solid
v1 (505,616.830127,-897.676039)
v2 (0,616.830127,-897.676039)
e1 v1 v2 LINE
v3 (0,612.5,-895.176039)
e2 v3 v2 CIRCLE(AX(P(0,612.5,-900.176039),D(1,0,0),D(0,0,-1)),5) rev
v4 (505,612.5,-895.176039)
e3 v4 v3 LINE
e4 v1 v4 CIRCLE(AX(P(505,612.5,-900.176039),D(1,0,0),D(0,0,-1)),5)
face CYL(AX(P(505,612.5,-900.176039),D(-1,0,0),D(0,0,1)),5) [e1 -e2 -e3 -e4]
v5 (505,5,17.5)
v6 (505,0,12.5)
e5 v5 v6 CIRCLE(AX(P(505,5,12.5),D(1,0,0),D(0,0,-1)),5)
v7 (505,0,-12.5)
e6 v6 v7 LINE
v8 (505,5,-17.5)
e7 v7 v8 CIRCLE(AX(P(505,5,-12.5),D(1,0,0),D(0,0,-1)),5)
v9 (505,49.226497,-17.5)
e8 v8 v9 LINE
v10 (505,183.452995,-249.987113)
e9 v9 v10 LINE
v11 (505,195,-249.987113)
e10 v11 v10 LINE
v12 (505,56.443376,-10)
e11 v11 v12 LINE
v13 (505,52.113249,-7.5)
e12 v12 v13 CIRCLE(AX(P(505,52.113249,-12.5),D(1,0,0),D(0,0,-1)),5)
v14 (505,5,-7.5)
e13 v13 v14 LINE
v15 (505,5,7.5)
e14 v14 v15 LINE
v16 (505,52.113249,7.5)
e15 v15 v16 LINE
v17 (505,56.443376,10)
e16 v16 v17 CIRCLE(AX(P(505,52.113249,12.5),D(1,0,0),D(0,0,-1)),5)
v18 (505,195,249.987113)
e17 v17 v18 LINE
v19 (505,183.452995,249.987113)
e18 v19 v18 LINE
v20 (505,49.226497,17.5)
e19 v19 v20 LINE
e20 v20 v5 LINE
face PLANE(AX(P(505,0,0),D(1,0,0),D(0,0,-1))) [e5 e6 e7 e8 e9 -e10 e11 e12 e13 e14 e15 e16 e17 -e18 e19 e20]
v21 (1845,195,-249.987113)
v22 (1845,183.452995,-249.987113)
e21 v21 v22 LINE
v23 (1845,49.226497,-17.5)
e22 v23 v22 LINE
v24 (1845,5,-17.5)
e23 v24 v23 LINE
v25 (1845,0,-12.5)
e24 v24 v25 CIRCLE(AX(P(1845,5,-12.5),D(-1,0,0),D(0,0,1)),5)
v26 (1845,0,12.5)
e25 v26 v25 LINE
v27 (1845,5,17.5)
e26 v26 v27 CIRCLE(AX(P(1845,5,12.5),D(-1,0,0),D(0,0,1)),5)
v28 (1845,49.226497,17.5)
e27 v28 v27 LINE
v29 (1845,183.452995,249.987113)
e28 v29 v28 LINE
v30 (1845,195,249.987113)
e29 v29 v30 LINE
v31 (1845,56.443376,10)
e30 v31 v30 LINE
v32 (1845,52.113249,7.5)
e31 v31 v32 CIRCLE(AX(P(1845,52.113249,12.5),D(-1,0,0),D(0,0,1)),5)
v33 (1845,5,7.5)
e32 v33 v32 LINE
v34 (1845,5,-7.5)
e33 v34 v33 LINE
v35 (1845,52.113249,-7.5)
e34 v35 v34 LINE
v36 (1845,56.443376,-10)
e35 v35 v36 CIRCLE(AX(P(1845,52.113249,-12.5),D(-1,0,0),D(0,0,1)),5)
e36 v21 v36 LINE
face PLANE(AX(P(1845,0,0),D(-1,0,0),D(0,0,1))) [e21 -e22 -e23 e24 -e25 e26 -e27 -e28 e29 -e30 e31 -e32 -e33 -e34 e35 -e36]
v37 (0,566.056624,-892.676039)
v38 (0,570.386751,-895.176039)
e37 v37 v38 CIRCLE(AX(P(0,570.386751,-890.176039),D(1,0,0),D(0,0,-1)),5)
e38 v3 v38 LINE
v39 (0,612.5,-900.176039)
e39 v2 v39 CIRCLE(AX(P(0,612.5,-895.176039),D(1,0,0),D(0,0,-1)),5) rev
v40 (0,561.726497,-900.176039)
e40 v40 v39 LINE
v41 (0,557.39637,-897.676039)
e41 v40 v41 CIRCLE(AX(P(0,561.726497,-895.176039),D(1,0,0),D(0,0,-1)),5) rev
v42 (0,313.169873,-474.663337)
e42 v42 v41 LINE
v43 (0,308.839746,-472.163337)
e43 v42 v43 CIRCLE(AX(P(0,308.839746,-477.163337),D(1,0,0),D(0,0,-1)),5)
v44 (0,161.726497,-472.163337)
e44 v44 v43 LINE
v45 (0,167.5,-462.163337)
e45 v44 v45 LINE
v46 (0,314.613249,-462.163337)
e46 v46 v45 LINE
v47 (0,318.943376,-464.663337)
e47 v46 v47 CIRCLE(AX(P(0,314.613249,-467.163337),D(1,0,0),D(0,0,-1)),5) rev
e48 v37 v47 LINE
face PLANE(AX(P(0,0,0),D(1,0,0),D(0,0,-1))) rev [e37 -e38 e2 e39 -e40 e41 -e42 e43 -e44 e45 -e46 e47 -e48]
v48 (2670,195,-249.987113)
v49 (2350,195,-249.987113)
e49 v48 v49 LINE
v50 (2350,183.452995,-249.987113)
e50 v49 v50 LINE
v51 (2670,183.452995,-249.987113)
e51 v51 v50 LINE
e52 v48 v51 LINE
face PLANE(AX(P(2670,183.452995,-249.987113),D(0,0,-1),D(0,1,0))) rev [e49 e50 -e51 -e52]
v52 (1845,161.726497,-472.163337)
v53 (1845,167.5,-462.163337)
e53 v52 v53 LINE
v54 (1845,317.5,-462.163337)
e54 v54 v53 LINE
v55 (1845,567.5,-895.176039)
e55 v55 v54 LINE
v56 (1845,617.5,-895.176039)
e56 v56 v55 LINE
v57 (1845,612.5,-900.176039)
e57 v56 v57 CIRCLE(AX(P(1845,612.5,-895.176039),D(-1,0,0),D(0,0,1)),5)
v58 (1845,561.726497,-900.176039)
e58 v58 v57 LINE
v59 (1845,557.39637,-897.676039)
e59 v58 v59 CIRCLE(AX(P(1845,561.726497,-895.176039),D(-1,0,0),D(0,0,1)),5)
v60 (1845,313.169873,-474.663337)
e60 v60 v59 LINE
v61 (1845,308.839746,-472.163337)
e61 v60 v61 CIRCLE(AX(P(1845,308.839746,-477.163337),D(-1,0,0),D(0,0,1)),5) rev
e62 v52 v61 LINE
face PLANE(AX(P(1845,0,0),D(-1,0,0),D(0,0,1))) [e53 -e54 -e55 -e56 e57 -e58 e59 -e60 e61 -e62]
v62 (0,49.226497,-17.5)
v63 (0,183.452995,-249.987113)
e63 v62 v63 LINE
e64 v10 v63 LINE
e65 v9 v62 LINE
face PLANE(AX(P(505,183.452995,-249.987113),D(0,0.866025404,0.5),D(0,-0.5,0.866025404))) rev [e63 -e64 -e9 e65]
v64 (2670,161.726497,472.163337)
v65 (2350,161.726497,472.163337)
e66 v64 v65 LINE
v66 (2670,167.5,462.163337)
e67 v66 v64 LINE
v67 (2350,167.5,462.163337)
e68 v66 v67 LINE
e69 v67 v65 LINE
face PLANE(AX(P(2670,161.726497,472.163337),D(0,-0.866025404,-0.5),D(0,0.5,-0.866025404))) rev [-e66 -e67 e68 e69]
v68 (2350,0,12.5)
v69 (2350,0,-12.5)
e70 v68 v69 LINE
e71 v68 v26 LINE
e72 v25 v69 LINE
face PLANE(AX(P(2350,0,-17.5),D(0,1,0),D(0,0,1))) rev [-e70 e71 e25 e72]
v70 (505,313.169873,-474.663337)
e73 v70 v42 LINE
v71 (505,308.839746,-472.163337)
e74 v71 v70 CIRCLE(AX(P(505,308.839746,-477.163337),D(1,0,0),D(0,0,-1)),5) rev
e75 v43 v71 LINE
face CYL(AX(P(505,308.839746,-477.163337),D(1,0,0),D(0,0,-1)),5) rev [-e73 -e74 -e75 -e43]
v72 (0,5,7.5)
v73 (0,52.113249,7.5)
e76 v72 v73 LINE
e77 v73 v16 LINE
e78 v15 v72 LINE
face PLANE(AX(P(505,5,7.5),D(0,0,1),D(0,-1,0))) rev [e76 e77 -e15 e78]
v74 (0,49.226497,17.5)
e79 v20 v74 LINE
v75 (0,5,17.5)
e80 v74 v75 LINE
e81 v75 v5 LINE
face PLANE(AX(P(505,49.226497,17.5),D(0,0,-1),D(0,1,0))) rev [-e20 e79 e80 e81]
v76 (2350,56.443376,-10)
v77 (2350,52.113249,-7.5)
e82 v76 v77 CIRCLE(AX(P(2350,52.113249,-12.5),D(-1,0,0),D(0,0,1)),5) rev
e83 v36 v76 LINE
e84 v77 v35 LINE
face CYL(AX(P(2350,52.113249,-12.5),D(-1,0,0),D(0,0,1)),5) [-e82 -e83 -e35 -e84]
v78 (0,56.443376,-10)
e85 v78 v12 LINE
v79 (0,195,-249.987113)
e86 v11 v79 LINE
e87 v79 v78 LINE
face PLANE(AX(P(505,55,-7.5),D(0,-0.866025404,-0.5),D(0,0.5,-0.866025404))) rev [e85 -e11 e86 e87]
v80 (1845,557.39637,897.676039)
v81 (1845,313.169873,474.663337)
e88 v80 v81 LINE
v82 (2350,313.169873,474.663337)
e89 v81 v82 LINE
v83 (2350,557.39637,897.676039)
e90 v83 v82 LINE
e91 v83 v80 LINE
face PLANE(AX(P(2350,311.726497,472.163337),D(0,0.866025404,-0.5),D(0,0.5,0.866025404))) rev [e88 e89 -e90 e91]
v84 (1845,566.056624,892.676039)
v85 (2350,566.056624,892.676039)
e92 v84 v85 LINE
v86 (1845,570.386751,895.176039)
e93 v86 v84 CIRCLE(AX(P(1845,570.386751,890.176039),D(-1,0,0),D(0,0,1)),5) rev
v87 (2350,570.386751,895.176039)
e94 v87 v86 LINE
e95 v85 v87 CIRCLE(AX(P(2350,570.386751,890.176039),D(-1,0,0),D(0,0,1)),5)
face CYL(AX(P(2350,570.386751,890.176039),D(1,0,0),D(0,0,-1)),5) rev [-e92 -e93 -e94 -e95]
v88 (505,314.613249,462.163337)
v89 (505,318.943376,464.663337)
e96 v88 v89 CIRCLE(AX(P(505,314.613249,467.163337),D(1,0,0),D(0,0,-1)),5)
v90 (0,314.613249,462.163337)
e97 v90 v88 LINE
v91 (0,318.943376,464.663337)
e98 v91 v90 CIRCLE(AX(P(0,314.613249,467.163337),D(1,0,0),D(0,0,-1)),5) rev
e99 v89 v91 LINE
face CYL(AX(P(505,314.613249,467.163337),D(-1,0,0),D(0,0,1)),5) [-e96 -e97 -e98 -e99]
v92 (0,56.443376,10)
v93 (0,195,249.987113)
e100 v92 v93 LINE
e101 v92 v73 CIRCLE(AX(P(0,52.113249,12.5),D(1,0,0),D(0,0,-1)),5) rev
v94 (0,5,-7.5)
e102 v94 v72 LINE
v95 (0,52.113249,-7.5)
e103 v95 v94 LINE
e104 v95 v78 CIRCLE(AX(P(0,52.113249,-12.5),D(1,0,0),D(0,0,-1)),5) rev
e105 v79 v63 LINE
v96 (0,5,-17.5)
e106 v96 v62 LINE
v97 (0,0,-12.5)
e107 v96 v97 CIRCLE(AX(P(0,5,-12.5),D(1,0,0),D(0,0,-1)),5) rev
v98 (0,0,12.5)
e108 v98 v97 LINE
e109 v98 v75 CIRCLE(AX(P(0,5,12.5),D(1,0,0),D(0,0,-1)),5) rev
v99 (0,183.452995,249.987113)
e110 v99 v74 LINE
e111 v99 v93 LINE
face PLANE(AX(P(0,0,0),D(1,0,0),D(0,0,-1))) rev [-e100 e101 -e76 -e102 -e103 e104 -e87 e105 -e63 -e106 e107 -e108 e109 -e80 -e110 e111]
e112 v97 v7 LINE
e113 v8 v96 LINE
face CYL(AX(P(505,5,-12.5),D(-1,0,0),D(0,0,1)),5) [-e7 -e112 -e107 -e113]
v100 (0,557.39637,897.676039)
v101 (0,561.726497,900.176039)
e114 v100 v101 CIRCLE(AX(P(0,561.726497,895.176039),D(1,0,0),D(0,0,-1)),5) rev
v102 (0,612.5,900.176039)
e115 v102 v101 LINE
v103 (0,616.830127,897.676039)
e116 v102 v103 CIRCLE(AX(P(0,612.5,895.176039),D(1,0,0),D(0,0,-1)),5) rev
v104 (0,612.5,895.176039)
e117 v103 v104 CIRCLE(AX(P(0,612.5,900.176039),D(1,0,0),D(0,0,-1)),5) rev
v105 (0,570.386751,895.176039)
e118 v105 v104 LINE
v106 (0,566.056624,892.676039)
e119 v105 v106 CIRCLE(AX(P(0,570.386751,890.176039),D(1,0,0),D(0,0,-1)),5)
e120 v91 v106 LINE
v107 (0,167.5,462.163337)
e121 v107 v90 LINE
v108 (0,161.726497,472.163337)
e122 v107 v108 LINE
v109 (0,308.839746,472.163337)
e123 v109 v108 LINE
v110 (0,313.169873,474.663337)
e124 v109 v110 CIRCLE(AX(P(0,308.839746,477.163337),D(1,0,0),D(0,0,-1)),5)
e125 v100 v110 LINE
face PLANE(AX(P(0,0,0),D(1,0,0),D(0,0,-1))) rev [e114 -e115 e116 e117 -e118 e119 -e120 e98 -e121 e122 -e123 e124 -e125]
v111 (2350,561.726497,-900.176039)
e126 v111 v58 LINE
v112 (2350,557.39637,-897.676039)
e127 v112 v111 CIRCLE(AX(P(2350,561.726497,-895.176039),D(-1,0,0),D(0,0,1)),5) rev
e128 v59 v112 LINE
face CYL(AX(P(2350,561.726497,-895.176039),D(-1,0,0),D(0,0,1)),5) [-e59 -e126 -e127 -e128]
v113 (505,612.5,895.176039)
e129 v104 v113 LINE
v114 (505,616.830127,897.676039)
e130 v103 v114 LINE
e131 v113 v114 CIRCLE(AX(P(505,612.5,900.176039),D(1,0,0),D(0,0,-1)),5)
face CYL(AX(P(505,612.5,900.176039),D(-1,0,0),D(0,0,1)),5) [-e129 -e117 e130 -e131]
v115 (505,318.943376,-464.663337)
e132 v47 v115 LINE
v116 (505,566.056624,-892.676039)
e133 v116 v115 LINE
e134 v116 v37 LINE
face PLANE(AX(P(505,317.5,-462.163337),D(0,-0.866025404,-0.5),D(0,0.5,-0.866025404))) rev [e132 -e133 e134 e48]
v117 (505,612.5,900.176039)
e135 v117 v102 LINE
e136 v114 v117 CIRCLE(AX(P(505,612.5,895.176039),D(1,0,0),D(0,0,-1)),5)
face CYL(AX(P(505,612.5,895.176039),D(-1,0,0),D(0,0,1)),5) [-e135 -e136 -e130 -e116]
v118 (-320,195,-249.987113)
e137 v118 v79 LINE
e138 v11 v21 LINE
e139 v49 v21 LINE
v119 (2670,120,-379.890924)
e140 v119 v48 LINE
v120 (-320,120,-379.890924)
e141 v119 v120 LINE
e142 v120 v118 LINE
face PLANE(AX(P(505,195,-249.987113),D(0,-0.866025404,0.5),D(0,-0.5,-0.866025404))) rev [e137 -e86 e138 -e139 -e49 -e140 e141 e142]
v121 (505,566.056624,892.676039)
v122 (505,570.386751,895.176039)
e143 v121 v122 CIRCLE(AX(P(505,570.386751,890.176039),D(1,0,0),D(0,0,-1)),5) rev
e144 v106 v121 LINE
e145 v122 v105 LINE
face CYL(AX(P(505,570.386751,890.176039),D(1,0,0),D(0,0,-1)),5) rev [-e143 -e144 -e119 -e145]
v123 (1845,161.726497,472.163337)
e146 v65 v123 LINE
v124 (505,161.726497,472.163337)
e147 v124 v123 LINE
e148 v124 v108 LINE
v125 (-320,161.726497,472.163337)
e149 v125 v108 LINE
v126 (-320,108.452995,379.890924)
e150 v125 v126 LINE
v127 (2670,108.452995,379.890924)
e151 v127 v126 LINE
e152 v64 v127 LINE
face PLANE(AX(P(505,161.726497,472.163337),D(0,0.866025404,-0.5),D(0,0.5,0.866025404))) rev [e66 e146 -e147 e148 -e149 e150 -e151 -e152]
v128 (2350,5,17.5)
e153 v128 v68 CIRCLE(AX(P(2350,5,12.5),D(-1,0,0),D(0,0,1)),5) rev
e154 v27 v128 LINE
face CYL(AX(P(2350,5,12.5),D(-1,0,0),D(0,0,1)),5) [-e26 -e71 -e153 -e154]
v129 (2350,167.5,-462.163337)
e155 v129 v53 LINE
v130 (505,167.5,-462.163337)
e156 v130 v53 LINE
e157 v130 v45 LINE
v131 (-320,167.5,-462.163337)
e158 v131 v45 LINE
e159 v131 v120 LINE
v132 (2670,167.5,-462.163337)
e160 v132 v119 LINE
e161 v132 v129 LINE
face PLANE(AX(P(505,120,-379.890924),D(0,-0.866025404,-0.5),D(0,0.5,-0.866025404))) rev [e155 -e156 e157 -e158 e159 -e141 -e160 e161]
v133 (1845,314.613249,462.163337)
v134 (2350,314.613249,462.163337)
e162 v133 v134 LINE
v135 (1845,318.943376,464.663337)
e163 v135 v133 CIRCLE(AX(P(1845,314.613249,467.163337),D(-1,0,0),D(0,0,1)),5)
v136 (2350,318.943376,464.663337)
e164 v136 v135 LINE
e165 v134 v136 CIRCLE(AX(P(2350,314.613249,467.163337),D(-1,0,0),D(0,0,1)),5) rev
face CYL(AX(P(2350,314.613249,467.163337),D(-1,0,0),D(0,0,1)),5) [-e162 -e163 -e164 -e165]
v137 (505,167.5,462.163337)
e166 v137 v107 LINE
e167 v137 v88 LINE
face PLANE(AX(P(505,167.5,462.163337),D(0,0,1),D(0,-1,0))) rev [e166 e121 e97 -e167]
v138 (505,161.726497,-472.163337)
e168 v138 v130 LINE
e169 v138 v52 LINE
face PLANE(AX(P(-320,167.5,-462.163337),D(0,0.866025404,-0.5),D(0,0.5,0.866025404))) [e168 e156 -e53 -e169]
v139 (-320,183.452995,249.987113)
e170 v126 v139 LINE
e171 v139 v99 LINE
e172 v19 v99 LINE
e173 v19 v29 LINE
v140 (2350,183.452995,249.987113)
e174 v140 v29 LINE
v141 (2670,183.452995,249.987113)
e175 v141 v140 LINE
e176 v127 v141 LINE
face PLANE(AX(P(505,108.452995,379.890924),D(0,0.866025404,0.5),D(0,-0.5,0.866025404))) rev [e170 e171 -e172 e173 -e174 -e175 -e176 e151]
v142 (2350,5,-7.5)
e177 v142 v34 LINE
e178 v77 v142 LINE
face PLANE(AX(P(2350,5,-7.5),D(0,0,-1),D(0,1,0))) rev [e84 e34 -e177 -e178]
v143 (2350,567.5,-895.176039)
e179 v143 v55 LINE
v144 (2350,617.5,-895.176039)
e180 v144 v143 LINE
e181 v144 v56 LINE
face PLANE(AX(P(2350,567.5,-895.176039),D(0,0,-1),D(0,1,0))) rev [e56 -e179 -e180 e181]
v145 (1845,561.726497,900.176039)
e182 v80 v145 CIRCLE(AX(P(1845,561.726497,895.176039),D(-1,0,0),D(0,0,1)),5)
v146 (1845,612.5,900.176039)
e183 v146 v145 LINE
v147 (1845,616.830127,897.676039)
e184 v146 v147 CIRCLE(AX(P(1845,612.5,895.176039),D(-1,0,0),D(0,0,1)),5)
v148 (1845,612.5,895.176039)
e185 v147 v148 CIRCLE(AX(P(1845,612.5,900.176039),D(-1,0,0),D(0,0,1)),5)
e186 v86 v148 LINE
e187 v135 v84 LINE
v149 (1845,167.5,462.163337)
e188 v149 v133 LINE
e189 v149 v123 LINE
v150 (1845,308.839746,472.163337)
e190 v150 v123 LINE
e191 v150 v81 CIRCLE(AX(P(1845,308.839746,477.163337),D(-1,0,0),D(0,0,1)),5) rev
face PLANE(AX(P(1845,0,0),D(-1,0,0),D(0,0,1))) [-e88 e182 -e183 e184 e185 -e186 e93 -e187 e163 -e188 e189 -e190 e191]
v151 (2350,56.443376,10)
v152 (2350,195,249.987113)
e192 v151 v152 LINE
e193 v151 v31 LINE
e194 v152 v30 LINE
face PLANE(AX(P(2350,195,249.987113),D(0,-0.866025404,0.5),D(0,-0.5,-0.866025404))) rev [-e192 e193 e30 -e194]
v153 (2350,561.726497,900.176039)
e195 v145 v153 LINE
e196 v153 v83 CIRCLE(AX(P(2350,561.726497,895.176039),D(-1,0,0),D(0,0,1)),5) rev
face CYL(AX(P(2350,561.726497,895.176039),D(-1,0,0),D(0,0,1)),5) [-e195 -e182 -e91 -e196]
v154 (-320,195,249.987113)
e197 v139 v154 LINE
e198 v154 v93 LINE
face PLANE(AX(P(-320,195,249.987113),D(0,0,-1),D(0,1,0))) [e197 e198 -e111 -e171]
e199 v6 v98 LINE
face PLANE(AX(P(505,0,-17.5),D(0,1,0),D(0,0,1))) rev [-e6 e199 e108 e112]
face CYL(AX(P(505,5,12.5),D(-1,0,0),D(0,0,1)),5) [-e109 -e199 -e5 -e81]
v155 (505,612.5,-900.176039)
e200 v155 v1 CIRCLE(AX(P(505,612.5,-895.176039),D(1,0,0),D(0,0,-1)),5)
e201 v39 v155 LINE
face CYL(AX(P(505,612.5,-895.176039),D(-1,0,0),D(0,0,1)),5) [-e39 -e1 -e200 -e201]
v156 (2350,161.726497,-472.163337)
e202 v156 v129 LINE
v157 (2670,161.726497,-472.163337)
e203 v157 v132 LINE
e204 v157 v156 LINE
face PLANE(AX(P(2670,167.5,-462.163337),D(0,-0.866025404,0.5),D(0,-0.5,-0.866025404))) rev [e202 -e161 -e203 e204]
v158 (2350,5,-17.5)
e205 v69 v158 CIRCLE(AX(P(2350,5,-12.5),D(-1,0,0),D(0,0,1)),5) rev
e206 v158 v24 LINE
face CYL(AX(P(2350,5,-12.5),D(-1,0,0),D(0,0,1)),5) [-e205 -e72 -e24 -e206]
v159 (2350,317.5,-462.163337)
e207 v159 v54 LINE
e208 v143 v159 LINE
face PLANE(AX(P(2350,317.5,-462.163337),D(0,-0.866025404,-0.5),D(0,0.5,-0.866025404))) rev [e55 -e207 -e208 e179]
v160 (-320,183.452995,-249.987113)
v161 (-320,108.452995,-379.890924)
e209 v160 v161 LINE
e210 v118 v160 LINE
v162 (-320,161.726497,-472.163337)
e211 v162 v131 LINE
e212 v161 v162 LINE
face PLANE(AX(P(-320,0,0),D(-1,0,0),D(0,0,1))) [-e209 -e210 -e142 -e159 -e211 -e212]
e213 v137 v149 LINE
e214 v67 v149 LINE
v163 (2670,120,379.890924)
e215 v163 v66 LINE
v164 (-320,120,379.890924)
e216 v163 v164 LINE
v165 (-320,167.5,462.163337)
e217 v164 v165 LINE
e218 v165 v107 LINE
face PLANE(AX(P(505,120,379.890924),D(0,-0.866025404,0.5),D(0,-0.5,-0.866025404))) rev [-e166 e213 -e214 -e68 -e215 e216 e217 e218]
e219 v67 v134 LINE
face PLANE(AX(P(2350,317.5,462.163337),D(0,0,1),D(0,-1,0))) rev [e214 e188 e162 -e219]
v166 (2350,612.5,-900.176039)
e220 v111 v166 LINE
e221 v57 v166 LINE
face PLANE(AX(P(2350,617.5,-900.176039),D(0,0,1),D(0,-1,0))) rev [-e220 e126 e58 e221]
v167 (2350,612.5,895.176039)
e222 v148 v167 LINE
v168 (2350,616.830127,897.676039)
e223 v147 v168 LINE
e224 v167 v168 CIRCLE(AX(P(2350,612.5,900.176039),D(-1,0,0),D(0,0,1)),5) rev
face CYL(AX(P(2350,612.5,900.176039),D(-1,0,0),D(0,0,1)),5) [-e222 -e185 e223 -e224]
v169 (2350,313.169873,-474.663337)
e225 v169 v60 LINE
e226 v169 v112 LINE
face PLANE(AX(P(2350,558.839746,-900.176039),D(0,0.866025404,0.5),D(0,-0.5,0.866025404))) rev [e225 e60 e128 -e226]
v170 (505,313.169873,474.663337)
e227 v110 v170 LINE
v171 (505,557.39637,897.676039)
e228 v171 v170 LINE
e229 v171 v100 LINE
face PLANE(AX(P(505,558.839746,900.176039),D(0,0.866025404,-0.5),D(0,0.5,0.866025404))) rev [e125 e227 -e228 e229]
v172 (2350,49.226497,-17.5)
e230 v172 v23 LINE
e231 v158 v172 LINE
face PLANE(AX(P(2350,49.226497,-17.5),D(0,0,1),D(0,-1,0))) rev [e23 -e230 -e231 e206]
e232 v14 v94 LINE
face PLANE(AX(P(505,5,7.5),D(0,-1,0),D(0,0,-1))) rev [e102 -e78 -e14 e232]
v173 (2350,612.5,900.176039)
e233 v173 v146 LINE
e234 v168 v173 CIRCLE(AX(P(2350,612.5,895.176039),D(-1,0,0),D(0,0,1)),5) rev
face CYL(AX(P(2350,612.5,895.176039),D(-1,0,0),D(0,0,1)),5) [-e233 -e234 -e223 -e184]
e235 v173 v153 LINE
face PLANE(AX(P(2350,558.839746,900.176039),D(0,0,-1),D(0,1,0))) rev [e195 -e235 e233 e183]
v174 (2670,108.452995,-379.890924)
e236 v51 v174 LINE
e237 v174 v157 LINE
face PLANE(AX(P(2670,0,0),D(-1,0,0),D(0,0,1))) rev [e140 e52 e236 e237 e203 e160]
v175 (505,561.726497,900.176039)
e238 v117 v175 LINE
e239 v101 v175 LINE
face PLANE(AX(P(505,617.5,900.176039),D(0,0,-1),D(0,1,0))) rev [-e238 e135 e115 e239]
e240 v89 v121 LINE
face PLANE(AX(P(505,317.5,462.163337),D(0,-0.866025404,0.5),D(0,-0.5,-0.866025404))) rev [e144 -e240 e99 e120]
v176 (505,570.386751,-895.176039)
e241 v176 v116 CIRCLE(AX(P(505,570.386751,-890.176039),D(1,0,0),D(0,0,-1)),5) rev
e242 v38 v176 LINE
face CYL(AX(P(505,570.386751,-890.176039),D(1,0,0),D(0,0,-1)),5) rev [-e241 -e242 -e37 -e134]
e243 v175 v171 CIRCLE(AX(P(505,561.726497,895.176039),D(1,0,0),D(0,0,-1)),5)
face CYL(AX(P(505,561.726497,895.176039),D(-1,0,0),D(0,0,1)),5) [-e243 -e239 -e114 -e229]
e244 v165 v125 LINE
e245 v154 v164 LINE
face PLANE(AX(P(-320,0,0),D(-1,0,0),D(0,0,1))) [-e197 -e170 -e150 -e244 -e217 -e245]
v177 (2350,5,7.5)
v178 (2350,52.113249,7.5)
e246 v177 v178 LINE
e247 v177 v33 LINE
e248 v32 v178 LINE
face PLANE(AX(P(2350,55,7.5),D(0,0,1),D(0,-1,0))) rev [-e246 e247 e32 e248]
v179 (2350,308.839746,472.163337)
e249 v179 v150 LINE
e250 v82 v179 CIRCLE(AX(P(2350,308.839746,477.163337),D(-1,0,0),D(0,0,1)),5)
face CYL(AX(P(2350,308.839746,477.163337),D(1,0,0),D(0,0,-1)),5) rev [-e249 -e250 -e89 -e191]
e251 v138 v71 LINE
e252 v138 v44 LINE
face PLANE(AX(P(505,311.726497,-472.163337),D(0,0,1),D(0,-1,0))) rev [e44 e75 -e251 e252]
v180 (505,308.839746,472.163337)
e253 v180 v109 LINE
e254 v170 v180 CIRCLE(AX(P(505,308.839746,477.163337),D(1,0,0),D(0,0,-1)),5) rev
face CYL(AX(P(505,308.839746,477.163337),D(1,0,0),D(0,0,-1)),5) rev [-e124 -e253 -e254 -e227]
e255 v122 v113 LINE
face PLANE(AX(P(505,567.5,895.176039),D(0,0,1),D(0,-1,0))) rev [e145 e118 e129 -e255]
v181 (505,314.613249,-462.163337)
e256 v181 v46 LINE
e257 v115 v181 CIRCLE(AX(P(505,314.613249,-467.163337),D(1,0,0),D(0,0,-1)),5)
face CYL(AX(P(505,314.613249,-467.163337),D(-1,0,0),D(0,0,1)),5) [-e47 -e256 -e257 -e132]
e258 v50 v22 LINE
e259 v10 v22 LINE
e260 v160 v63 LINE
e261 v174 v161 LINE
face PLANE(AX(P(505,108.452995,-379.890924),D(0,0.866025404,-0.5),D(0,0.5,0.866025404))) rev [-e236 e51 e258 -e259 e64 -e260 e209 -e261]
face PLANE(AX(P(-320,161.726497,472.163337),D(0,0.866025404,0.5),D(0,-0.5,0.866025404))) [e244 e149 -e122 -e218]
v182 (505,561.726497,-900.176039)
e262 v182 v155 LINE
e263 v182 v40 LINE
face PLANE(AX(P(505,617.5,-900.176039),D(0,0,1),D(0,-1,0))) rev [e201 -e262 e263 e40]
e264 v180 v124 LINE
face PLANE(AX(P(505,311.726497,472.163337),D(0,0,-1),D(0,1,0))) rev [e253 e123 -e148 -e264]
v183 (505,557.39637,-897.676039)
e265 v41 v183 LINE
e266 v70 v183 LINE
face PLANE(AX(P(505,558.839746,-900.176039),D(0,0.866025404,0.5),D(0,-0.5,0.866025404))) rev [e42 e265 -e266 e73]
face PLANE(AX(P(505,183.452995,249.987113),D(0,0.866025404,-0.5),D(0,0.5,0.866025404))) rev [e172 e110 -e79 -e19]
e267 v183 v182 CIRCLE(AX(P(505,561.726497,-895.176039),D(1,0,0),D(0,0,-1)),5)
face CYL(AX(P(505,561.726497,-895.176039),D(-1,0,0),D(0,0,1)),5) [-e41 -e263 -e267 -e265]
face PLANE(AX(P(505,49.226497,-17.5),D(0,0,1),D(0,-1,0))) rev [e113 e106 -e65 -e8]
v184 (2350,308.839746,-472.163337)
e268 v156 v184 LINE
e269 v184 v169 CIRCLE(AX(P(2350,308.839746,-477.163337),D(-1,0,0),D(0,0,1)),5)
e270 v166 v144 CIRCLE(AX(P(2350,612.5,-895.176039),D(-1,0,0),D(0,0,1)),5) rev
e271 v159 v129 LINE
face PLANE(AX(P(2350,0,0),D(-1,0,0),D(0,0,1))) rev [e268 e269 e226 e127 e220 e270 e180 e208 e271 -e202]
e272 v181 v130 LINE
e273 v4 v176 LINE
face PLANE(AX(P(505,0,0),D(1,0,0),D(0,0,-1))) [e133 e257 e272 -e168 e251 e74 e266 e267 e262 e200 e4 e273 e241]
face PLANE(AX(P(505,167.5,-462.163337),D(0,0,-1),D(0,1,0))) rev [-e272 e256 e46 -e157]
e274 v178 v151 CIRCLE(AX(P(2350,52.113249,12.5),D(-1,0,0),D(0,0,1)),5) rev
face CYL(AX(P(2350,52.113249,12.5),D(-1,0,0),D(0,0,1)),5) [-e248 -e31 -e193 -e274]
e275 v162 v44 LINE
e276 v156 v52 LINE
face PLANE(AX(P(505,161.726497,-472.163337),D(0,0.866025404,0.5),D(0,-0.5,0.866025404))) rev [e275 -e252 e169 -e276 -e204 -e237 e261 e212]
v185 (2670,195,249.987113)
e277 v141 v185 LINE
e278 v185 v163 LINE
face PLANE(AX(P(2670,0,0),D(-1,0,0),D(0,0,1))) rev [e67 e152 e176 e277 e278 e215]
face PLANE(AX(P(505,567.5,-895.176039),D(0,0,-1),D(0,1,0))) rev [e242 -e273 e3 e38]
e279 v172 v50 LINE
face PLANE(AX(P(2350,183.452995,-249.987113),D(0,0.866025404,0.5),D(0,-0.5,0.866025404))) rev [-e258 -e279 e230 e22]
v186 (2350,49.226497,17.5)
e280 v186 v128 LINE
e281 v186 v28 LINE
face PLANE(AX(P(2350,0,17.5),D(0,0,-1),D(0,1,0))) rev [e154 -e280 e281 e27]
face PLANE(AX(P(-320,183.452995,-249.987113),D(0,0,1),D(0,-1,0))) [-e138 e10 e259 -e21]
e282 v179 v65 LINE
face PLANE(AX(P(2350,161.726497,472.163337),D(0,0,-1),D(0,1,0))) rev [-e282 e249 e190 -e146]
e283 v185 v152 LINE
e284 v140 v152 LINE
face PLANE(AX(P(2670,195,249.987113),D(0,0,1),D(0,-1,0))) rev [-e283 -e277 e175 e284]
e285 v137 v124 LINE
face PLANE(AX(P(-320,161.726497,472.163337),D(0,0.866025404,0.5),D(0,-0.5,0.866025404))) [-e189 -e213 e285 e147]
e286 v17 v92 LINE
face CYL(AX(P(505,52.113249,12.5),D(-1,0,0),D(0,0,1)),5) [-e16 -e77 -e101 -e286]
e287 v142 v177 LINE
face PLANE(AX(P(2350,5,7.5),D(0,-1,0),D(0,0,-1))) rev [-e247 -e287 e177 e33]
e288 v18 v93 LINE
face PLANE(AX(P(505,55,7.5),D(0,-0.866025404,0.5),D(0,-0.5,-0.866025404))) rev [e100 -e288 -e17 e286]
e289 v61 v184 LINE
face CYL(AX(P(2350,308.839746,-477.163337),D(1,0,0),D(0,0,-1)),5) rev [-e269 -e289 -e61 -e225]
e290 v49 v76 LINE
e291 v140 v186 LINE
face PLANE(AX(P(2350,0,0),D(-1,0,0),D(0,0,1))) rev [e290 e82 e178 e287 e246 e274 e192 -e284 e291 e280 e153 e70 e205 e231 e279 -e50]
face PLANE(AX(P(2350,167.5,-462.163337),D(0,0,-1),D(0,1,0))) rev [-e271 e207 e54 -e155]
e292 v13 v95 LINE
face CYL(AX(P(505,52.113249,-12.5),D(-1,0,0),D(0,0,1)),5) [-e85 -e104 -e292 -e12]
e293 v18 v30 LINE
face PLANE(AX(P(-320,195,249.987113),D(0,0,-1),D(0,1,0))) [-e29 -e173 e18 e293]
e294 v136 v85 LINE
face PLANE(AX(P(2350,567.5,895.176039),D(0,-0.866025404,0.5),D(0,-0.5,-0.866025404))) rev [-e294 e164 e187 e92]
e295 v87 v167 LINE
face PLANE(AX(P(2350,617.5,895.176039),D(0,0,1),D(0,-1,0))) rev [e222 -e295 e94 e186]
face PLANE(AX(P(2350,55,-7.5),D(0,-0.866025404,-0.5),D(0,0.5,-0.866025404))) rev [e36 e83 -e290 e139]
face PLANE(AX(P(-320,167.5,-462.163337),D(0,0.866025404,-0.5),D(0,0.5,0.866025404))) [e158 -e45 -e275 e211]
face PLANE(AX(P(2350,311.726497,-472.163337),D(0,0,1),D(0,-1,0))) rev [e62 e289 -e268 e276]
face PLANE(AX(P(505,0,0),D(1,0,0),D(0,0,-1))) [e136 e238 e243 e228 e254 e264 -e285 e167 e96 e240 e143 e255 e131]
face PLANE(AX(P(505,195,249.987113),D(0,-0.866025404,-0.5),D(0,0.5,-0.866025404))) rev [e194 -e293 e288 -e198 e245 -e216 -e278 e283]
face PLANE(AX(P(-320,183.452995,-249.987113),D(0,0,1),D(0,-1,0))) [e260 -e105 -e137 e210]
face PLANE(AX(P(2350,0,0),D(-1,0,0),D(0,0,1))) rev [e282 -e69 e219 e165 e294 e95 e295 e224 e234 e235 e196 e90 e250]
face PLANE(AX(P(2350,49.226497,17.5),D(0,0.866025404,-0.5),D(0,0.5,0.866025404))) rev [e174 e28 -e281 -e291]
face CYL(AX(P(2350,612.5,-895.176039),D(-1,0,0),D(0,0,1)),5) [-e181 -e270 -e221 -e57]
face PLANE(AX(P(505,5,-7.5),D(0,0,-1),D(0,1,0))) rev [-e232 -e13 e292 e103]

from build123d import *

# Parameters (mm, degrees)
BOSS_EXTRUDE1_DEPTH      = 505
BOSS_EXTRUDE3_DEPTH      = 1340
BOSS_EXTRUDE3_DEPTH_BACK = 825
BOSS_EXTRUDE4_DEPTH      = 505
BOSS_EXTRUDE5_DEPTH      = 320
FILLET1_R                = 5


with BuildPart() as part:
    # Sketch1 → Boss-Extrude1 (new body)
    with BuildSketch(Plane(origin=(0, 0, 0), x_dir=(0, 0, -1), z_dir=(1, 0, 0))):
        Polygon((-7.5, 5), (7.5, 5), (7.5, 55), (249.98711306, 195), (379.890923627, 120), (462.163336987, 167.5), (462.163336987, 317.5), (895.176038879, 567.5), (895.176038879, 617.5), (900.176038879, 617.5), (900.176038879, 558.839745962), (472.163336987, 311.726497308), (472.163336987, 161.726497308), (379.890923627, 108.452994616), (249.98711306, 183.452994616), (17.5, 49.226497308), (17.5, 0), (-17.5, 0), (-17.5, 49.226497308), (-249.98711306, 183.452994616), (-379.890923627, 108.452994616), (-472.163336987, 161.726497308), (-472.163336987, 311.726497308), (-900.176038879, 558.839745962), (-900.176038879, 617.5), (-895.176038879, 617.5), (-895.176038879, 567.5), (-462.163336987, 317.5), (-462.163336987, 167.5), (-379.890923627, 120), (-249.98711306, 195), (-7.5, 55), align=None)
    extrude(amount=BOSS_EXTRUDE1_DEPTH)

    # Sketch2 → Boss-Extrude3 (add, two sides: drawn at the far end of the back side and taken through both)
    with BuildSketch(Plane(origin=(505, 0, 0), x_dir=(0, 0, -1), z_dir=(1, 0, 0)).offset(-BOSS_EXTRUDE3_DEPTH_BACK)):
        Polygon((249.98711306, 195), (379.890923627, 120), (462.163336987, 167.5), (472.163336987, 161.726497308), (379.890923627, 108.452994616), (249.98711306, 183.452994616), align=None)
        Polygon((-462.163336987, 167.5), (-379.890923627, 120), (-249.98711306, 195), (-249.98711306, 183.452994616), (-379.890923627, 108.452994616), (-472.163336987, 161.726497308), align=None)
    extrude(amount=BOSS_EXTRUDE3_DEPTH + BOSS_EXTRUDE3_DEPTH_BACK)

    # Sketch4 → Boss-Extrude4 (add)
    with BuildSketch(Plane(origin=(1845, 0, 0), x_dir=(0, 0, -1), z_dir=(1, 0, 0))):
        Polygon((-900.176038879, 617.5), (-895.176038879, 617.5), (-895.176038879, 567.5), (-462.163336987, 317.5), (-462.163336987, 167.5), (-379.890923627, 120), (-249.98711306, 195), (-7.5, 55), (-7.5, 5), (7.5, 5), (7.5, 55), (249.98711306, 195), (379.890923627, 120), (462.163336987, 167.5), (462.163336987, 317.5), (895.176038879, 567.5), (895.176038879, 617.5), (900.176038879, 617.5), (900.176038879, 558.839745962), (472.163336987, 311.726497308), (472.163336987, 161.726497308), (379.890923627, 108.452994616), (249.98711306, 183.452994616), (17.5, 49.226497308), (17.5, 0), (-17.5, 0), (-17.5, 49.226497308), (-249.98711306, 183.452994616), (-379.890923627, 108.452994616), (-472.163336987, 161.726497308), (-472.163336987, 311.726497308), (-900.176038879, 558.839745962), align=None)
    extrude(amount=BOSS_EXTRUDE4_DEPTH)

    # Sketch5 → Boss-Extrude5 (add)
    with BuildSketch(Plane(origin=(2350, 0, 0), x_dir=(0, 0, -1), z_dir=(1, 0, 0))):
        Polygon((249.98711306, 195), (379.890923627, 120), (462.163336987, 167.5), (472.163336987, 161.726497308), (379.890923627, 108.452994616), (249.98711306, 183.452994616), align=None)
        Polygon((-462.163336987, 167.5), (-379.890923627, 120), (-249.98711306, 195), (-249.98711306, 183.452994616), (-379.890923627, 108.452994616), (-472.163336987, 161.726497308), align=None)
    extrude(amount=BOSS_EXTRUDE5_DEPTH)

    # Fillet1
    # the kernel refuses this fillet: 5 mm, written as the material it adds along each edge
    with BuildSketch(Plane(origin=(0, 567.5, -895.176038879), x_dir=(0, -0.4999999999999892, 0.8660254037844449), z_dir=(1, 0, 0)), Plane(origin=(0, 311.726497308, -472.163336987), x_dir=(0, 0.5000000000000101, -0.8660254037844327), z_dir=(1, 0, 0)), Plane(origin=(1845, 311.726497308, -472.163336987), x_dir=(0, 0.4999999999999846, -0.8660254037844476), z_dir=(1, 0, 0)), Plane(origin=(0, 311.726497308, 472.163336987), x_dir=(0, -1, 0), z_dir=(1, 0, 0)), Plane(origin=(1845, 311.726497308, 472.163336987), x_dir=(0, -1, 0), z_dir=(1, 0, 0)), Plane(origin=(0, 567.5, 895.176038879), x_dir=(0, 1, 0), z_dir=(1, 0, 0)), Plane(origin=(1845, 567.5, 895.176038879), x_dir=(0, 1, 0), z_dir=(1, 0, 0))) as fillet1_piece_1:
        with BuildLine():
            CenterArc((FILLET1_R * 0.57735026919, -FILLET1_R), FILLET1_R, 90, 60)
            Line((-FILLET1_R * 0.288675134595, -FILLET1_R * 0.5), (0, 0))
            Line((0, 0), (FILLET1_R * 0.57735026919, 0))
        make_face()
    extrude(amount=505)
    # the kernel refuses this fillet: 5 mm, written as the material it takes off along each edge
    with BuildSketch(Plane(origin=(-12.5, 617.5, -895.176038879), x_dir=(0, 0, -1), z_dir=(1, 0, 0)), Plane(origin=(-12.5, 617.5, -900.176038879), x_dir=(0, -1, 0), z_dir=(1, 0, 0)), Plane(origin=(1832.5, 617.5, -900.176038879), x_dir=(0, -1, 0), z_dir=(1, 0, 0)), Plane(origin=(-12.5, 617.5, 895.176038879), x_dir=(0, -1, 0), z_dir=(1, 0, 0)), Plane(origin=(-12.5, 617.5, 900.176038879), x_dir=(0, 0, -1), z_dir=(1, 0, 0)), Plane(origin=(1832.5, 617.5, 895.176038879), x_dir=(0, -1, 0), z_dir=(1, 0, 0)), Plane(origin=(-12.5, 0, 17.5), x_dir=(0, 1, 0), z_dir=(1, 0, 0)), Plane(origin=(-12.5, 0, -17.5), x_dir=(0, 0, 1), z_dir=(1, 0, 0)), Plane(origin=(1832.5, 0, -17.5), x_dir=(0, 0, 1), z_dir=(1, 0, 0)), Plane(origin=(1832.5, 0, 17.5), x_dir=(0, 1, 0), z_dir=(1, 0, 0))) as fillet1_2_piece_1:
        with BuildLine():
            CenterArc((FILLET1_R, -FILLET1_R), FILLET1_R, 90, 90)
            Line((0, -FILLET1_R), (0, 0))
            Line((0, 0), (FILLET1_R, 0))
        make_face()
    extrude(amount=530, mode=Mode.SUBTRACT)
    with BuildSketch(Plane(origin=(-7.216878365, 317.5, -462.163336987), x_dir=(0, -1, 0), z_dir=(1, 0, 0)), Plane(origin=(-7.216878365, 55, -7.5), x_dir=(0, -1, 0), z_dir=(1, 0, 0)), Plane(origin=(1837.783121635, 55, 7.5), x_dir=(0, 0.49999999999999023, 0.8660254037844441), z_dir=(1, 0, 0))) as fillet1_2_piece_2:
        with BuildLine():
            CenterArc((FILLET1_R * 0.57735026919, FILLET1_R), FILLET1_R, 210, 60)
            Line((-FILLET1_R * 0.288675134595, FILLET1_R * 0.5), (0, 0))
            Line((0, 0), (FILLET1_R * 0.57735026919, 0))
        make_face()
    extrude(amount=519.43375673, mode=Mode.SUBTRACT)
    with BuildSketch(Plane(origin=(-7.216878365, 558.839745962, -900.176038879), x_dir=(0, -0.5000000000000017, 0.8660254037844376), z_dir=(1, 0, 0)), Plane(origin=(1837.783121635, 558.839745962, -900.176038879), x_dir=(0, -0.5000000000000017, 0.8660254037844376), z_dir=(1, 0, 0)), Plane(origin=(1837.783121635, 317.5, 462.163336987), x_dir=(0, -1, 0), z_dir=(1, 0, 0)), Plane(origin=(-7.216878365, 317.5, 462.163336987), x_dir=(0, -1, 0), z_dir=(1, 0, 0)), Plane(origin=(-7.216878365, 558.839745962, 900.176038879), x_dir=(0, 1, 0), z_dir=(1, 0, 0)), Plane(origin=(1837.783121635, 558.839745962, 900.176038879), x_dir=(0, 1, 0), z_dir=(1, 0, 0)), Plane(origin=(-7.216878365, 55, 7.5), x_dir=(0, -1, 0), z_dir=(1, 0, 0)), Plane(origin=(1837.783121635, 55, -7.5), x_dir=(0, 0.49999999999999056, -0.8660254037844441), z_dir=(1, 0, 0))) as fillet1_2_piece_3:
        with BuildLine():
            CenterArc((FILLET1_R * 0.57735026919, -FILLET1_R), FILLET1_R, 90, 60)
            Line((-FILLET1_R * 0.288675134595, -FILLET1_R * 0.5), (0, 0))
            Line((0, 0), (FILLET1_R * 0.57735026919, 0))
        make_face()
    extrude(amount=519.43375673, mode=Mode.SUBTRACT)
    with BuildSketch(Plane(origin=(1832.5, 617.5, 900.176038879), x_dir=(0, -1, 0), z_dir=(1, 0, 0))) as fillet1_2_piece_4:
        with BuildLine():
            CenterArc((FILLET1_R, FILLET1_R), FILLET1_R, 180, 90)
            Line((0, FILLET1_R), (0, 0))
            Line((0, 0), (FILLET1_R, 0))
        make_face()
    extrude(amount=530, mode=Mode.SUBTRACT)


solid = part.part
